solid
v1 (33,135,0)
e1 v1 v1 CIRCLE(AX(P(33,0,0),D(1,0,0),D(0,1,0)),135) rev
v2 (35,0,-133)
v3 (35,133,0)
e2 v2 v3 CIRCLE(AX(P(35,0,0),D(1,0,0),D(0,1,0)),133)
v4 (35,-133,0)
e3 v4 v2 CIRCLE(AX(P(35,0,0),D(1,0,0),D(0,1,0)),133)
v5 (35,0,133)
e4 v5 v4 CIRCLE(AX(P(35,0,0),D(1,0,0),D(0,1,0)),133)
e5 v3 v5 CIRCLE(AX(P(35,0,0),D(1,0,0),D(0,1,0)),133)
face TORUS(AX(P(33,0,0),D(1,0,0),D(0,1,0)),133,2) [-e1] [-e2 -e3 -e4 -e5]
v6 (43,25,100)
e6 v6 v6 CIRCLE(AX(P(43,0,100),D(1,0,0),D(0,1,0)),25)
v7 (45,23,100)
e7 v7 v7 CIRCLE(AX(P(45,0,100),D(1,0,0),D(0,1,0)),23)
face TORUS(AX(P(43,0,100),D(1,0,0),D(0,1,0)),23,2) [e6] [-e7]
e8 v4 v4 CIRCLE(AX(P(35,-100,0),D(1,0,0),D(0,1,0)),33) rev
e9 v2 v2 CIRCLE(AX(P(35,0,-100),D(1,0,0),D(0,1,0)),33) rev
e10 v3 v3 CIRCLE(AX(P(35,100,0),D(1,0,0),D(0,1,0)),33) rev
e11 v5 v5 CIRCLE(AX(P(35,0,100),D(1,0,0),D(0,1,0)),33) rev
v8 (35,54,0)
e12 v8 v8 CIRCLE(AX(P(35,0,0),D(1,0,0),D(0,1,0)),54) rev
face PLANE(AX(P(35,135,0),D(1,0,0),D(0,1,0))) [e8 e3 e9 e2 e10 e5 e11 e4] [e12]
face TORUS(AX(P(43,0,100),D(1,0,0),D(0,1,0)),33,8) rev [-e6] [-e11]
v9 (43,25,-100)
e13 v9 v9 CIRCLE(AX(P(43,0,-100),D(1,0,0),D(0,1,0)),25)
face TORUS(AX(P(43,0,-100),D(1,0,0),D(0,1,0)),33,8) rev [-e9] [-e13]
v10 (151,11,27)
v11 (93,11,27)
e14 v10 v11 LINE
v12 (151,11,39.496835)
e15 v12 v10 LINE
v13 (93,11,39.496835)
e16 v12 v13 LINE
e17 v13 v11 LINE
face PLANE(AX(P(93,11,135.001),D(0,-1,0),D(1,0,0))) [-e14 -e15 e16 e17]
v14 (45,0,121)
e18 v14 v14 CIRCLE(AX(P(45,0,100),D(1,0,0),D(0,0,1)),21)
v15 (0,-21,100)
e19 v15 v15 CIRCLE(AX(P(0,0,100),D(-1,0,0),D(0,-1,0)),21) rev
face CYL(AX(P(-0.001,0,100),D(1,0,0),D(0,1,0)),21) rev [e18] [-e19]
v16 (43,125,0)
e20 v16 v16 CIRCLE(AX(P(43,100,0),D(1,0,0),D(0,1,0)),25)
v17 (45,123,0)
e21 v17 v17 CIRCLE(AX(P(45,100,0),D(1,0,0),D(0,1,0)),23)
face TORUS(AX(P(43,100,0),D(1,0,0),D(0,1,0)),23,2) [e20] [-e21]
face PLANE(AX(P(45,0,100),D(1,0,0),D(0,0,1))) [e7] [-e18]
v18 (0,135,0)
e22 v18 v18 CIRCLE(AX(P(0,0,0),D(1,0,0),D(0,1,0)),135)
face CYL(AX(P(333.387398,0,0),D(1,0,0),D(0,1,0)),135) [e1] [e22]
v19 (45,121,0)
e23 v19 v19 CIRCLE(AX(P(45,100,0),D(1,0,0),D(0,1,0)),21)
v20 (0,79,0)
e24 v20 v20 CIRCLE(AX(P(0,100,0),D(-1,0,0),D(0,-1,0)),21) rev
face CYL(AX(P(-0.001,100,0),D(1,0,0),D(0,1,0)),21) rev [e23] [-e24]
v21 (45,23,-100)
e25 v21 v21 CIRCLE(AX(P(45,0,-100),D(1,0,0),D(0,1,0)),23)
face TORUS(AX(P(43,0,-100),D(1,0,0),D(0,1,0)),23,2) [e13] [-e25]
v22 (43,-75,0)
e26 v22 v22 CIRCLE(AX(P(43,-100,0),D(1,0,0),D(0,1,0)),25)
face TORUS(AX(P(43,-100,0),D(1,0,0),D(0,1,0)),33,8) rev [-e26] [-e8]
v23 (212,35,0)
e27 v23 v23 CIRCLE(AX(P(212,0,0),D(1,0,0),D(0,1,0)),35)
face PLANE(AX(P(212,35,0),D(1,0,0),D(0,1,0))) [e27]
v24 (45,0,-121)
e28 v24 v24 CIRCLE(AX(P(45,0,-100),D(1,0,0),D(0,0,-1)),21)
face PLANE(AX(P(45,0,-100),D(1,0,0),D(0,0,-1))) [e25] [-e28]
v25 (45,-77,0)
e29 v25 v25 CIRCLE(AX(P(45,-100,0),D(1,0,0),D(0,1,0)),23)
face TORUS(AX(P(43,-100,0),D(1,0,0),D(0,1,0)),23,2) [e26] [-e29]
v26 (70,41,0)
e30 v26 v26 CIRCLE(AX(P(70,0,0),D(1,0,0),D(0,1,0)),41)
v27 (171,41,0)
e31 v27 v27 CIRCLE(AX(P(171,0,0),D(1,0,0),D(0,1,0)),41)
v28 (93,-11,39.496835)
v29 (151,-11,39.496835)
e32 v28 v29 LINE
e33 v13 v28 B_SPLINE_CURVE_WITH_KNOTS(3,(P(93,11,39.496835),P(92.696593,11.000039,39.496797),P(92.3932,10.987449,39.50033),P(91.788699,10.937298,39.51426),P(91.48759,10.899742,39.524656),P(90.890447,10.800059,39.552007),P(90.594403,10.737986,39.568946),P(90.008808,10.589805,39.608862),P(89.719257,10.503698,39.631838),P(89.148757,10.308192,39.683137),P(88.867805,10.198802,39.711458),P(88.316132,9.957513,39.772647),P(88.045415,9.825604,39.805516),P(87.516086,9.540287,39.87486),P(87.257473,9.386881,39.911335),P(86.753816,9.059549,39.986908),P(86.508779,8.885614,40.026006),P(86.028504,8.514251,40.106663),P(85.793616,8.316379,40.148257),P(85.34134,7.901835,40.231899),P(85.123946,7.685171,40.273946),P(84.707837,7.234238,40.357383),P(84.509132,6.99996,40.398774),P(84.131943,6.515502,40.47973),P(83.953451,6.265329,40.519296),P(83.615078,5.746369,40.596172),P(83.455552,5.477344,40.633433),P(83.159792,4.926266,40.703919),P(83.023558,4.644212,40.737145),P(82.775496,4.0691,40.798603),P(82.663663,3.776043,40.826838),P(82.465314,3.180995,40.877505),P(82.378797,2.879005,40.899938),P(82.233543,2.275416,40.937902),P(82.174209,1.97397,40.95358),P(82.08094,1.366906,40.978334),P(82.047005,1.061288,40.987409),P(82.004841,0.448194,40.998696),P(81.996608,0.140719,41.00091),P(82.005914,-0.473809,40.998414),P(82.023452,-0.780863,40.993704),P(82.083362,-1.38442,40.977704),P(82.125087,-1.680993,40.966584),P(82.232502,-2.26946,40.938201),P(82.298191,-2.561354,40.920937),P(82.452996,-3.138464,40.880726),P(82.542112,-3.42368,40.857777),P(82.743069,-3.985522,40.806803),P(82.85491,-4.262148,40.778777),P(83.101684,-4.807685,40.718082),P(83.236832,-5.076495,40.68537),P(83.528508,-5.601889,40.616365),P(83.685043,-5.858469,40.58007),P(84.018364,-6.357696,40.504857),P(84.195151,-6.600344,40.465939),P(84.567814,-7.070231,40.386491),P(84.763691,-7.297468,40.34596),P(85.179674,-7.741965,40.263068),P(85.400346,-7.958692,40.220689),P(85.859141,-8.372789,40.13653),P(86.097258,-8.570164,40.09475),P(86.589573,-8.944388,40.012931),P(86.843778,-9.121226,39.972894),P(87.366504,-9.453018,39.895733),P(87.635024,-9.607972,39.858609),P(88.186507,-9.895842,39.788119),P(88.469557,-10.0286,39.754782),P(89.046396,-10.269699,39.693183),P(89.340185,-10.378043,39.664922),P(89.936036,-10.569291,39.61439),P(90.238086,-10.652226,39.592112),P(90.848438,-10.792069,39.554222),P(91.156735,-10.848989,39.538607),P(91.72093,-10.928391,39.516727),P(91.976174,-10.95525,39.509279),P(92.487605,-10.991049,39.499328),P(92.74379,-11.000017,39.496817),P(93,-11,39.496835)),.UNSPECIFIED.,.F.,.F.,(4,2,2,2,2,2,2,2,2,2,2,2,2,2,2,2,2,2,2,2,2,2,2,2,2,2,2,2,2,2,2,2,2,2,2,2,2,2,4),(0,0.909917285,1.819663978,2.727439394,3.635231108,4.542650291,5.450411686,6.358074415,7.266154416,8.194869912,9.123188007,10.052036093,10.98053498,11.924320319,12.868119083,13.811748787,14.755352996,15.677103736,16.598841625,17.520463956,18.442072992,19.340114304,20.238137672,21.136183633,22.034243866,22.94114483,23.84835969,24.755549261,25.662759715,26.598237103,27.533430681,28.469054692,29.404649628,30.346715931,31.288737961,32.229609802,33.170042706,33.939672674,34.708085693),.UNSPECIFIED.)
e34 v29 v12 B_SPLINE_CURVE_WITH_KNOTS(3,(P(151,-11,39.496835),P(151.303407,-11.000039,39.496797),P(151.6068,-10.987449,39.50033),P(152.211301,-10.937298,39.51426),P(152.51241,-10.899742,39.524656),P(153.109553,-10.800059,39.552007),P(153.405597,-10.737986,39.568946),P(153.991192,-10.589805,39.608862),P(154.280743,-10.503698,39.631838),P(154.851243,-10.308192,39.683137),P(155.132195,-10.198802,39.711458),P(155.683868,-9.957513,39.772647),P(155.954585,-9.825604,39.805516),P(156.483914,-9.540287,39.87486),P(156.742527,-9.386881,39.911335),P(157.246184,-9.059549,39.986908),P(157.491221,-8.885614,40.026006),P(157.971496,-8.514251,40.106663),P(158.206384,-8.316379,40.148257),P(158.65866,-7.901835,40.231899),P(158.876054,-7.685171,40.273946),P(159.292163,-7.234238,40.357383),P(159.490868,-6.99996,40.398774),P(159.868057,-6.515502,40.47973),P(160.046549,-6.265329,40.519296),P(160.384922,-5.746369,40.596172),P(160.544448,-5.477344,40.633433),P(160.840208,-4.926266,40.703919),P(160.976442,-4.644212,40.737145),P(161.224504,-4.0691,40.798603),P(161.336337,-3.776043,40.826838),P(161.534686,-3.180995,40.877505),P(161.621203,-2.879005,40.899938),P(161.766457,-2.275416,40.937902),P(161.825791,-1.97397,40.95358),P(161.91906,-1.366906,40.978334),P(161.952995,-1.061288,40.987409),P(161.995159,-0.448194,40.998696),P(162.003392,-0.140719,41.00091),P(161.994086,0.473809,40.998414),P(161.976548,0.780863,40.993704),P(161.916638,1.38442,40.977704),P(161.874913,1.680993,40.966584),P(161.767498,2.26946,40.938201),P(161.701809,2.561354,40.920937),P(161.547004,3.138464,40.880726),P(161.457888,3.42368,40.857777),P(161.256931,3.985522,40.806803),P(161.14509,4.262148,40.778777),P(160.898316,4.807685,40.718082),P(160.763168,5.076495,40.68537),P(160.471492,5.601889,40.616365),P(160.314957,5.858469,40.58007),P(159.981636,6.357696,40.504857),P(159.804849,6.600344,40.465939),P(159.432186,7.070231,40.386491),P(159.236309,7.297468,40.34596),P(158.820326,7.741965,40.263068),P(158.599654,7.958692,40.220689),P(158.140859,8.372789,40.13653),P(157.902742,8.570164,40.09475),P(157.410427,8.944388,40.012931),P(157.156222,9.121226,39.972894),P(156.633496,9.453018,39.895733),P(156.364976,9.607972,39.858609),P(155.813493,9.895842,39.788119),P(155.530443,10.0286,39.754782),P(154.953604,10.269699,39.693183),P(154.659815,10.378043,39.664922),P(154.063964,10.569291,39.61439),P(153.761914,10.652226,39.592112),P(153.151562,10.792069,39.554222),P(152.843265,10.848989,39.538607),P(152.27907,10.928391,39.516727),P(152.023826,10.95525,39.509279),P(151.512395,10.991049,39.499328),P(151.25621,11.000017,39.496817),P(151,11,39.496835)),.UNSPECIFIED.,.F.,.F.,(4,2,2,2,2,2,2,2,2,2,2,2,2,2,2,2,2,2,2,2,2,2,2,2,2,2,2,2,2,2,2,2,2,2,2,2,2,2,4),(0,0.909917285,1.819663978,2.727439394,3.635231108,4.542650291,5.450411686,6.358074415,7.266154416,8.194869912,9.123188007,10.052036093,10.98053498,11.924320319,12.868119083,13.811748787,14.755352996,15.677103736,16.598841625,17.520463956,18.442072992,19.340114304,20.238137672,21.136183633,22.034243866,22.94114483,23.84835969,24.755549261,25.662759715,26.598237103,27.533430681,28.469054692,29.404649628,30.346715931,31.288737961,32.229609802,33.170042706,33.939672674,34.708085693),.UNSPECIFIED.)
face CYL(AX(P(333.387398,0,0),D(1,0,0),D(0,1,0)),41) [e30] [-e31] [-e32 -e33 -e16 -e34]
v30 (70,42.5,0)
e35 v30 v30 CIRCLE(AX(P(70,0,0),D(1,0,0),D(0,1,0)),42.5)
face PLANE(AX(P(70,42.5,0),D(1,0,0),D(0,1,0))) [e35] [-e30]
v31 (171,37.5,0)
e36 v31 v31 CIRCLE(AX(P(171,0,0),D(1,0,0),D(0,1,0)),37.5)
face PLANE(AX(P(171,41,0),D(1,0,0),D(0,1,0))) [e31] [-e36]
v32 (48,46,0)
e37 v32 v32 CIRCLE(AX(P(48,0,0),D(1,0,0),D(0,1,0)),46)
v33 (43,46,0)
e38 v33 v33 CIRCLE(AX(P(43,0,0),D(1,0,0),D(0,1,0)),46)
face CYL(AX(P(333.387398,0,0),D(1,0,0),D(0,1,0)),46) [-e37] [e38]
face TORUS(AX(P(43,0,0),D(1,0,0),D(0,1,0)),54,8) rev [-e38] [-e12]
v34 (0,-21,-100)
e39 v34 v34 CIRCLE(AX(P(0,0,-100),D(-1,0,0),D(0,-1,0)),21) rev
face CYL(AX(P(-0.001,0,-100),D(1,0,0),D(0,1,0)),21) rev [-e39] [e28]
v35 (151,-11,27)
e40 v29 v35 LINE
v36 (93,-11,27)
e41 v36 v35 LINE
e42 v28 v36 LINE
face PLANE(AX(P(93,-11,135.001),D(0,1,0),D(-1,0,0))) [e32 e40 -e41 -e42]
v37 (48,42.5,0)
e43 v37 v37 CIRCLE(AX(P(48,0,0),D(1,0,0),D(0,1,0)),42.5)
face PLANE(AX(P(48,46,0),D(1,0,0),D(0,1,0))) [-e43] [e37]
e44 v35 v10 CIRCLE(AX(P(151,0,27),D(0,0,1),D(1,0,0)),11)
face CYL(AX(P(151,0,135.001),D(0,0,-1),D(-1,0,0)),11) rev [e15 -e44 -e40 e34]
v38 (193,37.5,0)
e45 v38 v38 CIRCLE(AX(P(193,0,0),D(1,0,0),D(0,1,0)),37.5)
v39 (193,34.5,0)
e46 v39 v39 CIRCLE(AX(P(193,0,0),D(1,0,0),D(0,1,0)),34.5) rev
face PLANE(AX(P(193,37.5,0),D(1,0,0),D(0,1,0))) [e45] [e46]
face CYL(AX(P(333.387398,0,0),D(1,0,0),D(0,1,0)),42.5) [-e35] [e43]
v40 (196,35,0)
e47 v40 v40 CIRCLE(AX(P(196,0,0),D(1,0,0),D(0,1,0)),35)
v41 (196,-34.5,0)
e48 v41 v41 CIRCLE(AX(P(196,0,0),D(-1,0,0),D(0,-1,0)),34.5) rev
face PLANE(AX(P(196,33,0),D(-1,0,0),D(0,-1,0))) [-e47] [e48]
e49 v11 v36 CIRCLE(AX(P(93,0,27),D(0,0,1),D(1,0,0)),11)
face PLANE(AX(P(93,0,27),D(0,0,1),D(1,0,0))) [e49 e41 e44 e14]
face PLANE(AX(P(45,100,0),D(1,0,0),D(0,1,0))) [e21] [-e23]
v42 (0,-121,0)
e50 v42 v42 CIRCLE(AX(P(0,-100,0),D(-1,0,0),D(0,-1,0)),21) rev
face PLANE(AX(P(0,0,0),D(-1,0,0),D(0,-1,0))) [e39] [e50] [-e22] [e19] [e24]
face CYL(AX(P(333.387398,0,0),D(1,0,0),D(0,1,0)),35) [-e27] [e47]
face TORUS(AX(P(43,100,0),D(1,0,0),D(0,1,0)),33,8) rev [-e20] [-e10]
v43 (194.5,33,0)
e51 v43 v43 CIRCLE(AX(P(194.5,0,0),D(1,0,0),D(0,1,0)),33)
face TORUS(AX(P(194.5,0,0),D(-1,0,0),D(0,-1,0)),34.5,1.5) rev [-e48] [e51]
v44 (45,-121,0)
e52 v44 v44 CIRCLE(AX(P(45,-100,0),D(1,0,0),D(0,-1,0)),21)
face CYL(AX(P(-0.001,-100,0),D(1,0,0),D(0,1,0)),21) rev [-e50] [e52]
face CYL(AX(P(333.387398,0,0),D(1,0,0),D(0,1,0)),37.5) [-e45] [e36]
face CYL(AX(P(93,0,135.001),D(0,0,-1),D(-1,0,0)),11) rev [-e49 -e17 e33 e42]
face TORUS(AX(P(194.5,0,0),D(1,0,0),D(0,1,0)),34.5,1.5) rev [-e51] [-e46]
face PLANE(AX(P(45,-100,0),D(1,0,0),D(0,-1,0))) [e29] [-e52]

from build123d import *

# Parameters (mm, degrees)
TAGLIO_ESTRUSIONE4_REACH      = 262.344
SCHIZZO3_R                    = 21
ESTRUSIONE_ESTRUSIONE2_START  = 10
SCHIZZO3_5_R                  = 25
SCHIZZO3_5_R_2                = 21
ESTRUSIONE_ESTRUSIONE2_DEPTH  = 10
RIPETIZIONECIRCOLARE1_COUNT   = 4
TAGLIO_ESTRUSIONE5_REACH      = 314.296
TAGLIO_ESTRUSIONE5_END_RADIUS = 41
TAGLIO_ESTRUSIONE5_START      = 27
RACCORDO1_R                   = 1.5
RACCORDO2_R                   = 8
RACCORDO3_R                   = 2


with BuildPart() as part:
    # Schizzo1 → Rivoluzione1 (revolve)
    with BuildSketch(Plane.XY):
        Polygon((0, 135), (35, 135), (35, 46), (48, 46), (48, 42.5), (70, 42.5), (70, 41), (171, 41), (171, 37.5), (193, 37.5), (193, 33), (196, 33), (196, 35), (212, 35), (212, 0), (0, 0), align=None)
    revolve(axis=Axis((333.387398458, 0, 0), (-1, 0, 0)))

    # Schizzo3 → Taglio-Estrusione4 (cut, up to next)
    with BuildSketch(Plane(origin=(35, 0, 0), x_dir=(0, 0, -1), z_dir=(1, 0, 0)), mode=Mode.PRIVATE) as taglio_estrusione4_sk1:
        with Locations(Location((0, 100, 0), (0, 0, 90))):
            Circle(SCHIZZO3_R)
    taglio_estrusione4_tool1 = extrude(taglio_estrusione4_sk1.sketch, amount=-TAGLIO_ESTRUSIONE4_REACH, mode=Mode.PRIVATE) & part.part
    taglio_estrusione4 = taglio_estrusione4_tool1.solids().sort_by_distance((35, 100, 0))[0]
    add(taglio_estrusione4, mode=Mode.SUBTRACT)

    # Schizzo3<5> → Estrusione-Estrusione2 (add)
    with BuildSketch(Plane(origin=(35, 0, 0), x_dir=(0, 0, -1), z_dir=(1, 0, 0)).offset(ESTRUSIONE_ESTRUSIONE2_START)):
        with Locations(Location((0, 100, 0), (0, 0, 90))):
            Circle(SCHIZZO3_5_R)
        with Locations(Location((0, 100, 0), (0, 0, 90))):
            Circle(SCHIZZO3_5_R_2, mode=Mode.SUBTRACT)
    estrusione_estrusione2 = extrude(amount=-ESTRUSIONE_ESTRUSIONE2_DEPTH)

    # RipetizioneCircolare1: Taglio-Estrusione4, Estrusione-Estrusione2 ×4 about axis
    ripetizionecircolare1_axis = Axis((0, 0, 0), (1, 0, 0))
    add([taglio_estrusione4.rotate(ripetizionecircolare1_axis, i * 360 / RIPETIZIONECIRCOLARE1_COUNT) for i in range(1, RIPETIZIONECIRCOLARE1_COUNT)], mode=Mode.SUBTRACT)
    add([estrusione_estrusione2.rotate(ripetizionecircolare1_axis, i * 360 / RIPETIZIONECIRCOLARE1_COUNT) for i in range(1, RIPETIZIONECIRCOLARE1_COUNT)])

    # Taglio-Estrusione5: up to this cylinder (the profile starts inside it)
    taglio_estrusione5_end = Plane(origin=(122, 0, 0), z_dir=(1, 0, 0)) * Cylinder(TAGLIO_ESTRUSIONE5_END_RADIUS, 711.592, mode=Mode.PRIVATE)
    # Schizzo5 → Taglio-Estrusione5 (cut, up to the surface)
    with BuildSketch(Plane.XY.offset(TAGLIO_ESTRUSIONE5_START), mode=Mode.PRIVATE) as taglio_estrusione5_sk1:
        with BuildLine():
            Line((93, 11), (151, 11))
            ThreePointArc((151, 11), (162, 0), (151, -11))
            Line((151, -11), (93, -11))
            ThreePointArc((93, -11), (82, 0), (93, 11))
        make_face()
    taglio_estrusione5_tool1 = extrude(taglio_estrusione5_sk1.sketch, amount=TAGLIO_ESTRUSIONE5_REACH, mode=Mode.PRIVATE) & taglio_estrusione5_end
    add(taglio_estrusione5_tool1.solids().sort_by_distance((122, 0, 27))[0], mode=Mode.SUBTRACT)

    # Raccordo1
    raccordo1_edges = [part.edges().sort_by_distance(p)[0] for p in [
        (196, -33, 0),
        (193, -33, 0),
    ]]
    fillet(raccordo1_edges, radius=RACCORDO1_R - 0.0001)  # a hair under: the kernel refuses the full size

    # Raccordo2
    raccordo2_edges = [part.edges().sort_by_distance(p)[0] for p in [
        (35, -46, 0),
        (35, 75, 0),
        (35, 0, -75),
        (35, -75, 0),
        (35, 0, 75),
    ]]
    fillet(raccordo2_edges, radius=RACCORDO2_R)

    # Raccordo3
    raccordo3_edges = [part.edges().sort_by_distance(p)[0] for p in [
        (35, -135, 0),
        (45, 75, 0),
        (45, 0, -75),
        (45, -75, 0),
        (45, 0, 75),
    ]]
    fillet(raccordo3_edges, radius=RACCORDO3_R - 0.0001)  # a hair under: the kernel refuses the full size


solid = part.part
